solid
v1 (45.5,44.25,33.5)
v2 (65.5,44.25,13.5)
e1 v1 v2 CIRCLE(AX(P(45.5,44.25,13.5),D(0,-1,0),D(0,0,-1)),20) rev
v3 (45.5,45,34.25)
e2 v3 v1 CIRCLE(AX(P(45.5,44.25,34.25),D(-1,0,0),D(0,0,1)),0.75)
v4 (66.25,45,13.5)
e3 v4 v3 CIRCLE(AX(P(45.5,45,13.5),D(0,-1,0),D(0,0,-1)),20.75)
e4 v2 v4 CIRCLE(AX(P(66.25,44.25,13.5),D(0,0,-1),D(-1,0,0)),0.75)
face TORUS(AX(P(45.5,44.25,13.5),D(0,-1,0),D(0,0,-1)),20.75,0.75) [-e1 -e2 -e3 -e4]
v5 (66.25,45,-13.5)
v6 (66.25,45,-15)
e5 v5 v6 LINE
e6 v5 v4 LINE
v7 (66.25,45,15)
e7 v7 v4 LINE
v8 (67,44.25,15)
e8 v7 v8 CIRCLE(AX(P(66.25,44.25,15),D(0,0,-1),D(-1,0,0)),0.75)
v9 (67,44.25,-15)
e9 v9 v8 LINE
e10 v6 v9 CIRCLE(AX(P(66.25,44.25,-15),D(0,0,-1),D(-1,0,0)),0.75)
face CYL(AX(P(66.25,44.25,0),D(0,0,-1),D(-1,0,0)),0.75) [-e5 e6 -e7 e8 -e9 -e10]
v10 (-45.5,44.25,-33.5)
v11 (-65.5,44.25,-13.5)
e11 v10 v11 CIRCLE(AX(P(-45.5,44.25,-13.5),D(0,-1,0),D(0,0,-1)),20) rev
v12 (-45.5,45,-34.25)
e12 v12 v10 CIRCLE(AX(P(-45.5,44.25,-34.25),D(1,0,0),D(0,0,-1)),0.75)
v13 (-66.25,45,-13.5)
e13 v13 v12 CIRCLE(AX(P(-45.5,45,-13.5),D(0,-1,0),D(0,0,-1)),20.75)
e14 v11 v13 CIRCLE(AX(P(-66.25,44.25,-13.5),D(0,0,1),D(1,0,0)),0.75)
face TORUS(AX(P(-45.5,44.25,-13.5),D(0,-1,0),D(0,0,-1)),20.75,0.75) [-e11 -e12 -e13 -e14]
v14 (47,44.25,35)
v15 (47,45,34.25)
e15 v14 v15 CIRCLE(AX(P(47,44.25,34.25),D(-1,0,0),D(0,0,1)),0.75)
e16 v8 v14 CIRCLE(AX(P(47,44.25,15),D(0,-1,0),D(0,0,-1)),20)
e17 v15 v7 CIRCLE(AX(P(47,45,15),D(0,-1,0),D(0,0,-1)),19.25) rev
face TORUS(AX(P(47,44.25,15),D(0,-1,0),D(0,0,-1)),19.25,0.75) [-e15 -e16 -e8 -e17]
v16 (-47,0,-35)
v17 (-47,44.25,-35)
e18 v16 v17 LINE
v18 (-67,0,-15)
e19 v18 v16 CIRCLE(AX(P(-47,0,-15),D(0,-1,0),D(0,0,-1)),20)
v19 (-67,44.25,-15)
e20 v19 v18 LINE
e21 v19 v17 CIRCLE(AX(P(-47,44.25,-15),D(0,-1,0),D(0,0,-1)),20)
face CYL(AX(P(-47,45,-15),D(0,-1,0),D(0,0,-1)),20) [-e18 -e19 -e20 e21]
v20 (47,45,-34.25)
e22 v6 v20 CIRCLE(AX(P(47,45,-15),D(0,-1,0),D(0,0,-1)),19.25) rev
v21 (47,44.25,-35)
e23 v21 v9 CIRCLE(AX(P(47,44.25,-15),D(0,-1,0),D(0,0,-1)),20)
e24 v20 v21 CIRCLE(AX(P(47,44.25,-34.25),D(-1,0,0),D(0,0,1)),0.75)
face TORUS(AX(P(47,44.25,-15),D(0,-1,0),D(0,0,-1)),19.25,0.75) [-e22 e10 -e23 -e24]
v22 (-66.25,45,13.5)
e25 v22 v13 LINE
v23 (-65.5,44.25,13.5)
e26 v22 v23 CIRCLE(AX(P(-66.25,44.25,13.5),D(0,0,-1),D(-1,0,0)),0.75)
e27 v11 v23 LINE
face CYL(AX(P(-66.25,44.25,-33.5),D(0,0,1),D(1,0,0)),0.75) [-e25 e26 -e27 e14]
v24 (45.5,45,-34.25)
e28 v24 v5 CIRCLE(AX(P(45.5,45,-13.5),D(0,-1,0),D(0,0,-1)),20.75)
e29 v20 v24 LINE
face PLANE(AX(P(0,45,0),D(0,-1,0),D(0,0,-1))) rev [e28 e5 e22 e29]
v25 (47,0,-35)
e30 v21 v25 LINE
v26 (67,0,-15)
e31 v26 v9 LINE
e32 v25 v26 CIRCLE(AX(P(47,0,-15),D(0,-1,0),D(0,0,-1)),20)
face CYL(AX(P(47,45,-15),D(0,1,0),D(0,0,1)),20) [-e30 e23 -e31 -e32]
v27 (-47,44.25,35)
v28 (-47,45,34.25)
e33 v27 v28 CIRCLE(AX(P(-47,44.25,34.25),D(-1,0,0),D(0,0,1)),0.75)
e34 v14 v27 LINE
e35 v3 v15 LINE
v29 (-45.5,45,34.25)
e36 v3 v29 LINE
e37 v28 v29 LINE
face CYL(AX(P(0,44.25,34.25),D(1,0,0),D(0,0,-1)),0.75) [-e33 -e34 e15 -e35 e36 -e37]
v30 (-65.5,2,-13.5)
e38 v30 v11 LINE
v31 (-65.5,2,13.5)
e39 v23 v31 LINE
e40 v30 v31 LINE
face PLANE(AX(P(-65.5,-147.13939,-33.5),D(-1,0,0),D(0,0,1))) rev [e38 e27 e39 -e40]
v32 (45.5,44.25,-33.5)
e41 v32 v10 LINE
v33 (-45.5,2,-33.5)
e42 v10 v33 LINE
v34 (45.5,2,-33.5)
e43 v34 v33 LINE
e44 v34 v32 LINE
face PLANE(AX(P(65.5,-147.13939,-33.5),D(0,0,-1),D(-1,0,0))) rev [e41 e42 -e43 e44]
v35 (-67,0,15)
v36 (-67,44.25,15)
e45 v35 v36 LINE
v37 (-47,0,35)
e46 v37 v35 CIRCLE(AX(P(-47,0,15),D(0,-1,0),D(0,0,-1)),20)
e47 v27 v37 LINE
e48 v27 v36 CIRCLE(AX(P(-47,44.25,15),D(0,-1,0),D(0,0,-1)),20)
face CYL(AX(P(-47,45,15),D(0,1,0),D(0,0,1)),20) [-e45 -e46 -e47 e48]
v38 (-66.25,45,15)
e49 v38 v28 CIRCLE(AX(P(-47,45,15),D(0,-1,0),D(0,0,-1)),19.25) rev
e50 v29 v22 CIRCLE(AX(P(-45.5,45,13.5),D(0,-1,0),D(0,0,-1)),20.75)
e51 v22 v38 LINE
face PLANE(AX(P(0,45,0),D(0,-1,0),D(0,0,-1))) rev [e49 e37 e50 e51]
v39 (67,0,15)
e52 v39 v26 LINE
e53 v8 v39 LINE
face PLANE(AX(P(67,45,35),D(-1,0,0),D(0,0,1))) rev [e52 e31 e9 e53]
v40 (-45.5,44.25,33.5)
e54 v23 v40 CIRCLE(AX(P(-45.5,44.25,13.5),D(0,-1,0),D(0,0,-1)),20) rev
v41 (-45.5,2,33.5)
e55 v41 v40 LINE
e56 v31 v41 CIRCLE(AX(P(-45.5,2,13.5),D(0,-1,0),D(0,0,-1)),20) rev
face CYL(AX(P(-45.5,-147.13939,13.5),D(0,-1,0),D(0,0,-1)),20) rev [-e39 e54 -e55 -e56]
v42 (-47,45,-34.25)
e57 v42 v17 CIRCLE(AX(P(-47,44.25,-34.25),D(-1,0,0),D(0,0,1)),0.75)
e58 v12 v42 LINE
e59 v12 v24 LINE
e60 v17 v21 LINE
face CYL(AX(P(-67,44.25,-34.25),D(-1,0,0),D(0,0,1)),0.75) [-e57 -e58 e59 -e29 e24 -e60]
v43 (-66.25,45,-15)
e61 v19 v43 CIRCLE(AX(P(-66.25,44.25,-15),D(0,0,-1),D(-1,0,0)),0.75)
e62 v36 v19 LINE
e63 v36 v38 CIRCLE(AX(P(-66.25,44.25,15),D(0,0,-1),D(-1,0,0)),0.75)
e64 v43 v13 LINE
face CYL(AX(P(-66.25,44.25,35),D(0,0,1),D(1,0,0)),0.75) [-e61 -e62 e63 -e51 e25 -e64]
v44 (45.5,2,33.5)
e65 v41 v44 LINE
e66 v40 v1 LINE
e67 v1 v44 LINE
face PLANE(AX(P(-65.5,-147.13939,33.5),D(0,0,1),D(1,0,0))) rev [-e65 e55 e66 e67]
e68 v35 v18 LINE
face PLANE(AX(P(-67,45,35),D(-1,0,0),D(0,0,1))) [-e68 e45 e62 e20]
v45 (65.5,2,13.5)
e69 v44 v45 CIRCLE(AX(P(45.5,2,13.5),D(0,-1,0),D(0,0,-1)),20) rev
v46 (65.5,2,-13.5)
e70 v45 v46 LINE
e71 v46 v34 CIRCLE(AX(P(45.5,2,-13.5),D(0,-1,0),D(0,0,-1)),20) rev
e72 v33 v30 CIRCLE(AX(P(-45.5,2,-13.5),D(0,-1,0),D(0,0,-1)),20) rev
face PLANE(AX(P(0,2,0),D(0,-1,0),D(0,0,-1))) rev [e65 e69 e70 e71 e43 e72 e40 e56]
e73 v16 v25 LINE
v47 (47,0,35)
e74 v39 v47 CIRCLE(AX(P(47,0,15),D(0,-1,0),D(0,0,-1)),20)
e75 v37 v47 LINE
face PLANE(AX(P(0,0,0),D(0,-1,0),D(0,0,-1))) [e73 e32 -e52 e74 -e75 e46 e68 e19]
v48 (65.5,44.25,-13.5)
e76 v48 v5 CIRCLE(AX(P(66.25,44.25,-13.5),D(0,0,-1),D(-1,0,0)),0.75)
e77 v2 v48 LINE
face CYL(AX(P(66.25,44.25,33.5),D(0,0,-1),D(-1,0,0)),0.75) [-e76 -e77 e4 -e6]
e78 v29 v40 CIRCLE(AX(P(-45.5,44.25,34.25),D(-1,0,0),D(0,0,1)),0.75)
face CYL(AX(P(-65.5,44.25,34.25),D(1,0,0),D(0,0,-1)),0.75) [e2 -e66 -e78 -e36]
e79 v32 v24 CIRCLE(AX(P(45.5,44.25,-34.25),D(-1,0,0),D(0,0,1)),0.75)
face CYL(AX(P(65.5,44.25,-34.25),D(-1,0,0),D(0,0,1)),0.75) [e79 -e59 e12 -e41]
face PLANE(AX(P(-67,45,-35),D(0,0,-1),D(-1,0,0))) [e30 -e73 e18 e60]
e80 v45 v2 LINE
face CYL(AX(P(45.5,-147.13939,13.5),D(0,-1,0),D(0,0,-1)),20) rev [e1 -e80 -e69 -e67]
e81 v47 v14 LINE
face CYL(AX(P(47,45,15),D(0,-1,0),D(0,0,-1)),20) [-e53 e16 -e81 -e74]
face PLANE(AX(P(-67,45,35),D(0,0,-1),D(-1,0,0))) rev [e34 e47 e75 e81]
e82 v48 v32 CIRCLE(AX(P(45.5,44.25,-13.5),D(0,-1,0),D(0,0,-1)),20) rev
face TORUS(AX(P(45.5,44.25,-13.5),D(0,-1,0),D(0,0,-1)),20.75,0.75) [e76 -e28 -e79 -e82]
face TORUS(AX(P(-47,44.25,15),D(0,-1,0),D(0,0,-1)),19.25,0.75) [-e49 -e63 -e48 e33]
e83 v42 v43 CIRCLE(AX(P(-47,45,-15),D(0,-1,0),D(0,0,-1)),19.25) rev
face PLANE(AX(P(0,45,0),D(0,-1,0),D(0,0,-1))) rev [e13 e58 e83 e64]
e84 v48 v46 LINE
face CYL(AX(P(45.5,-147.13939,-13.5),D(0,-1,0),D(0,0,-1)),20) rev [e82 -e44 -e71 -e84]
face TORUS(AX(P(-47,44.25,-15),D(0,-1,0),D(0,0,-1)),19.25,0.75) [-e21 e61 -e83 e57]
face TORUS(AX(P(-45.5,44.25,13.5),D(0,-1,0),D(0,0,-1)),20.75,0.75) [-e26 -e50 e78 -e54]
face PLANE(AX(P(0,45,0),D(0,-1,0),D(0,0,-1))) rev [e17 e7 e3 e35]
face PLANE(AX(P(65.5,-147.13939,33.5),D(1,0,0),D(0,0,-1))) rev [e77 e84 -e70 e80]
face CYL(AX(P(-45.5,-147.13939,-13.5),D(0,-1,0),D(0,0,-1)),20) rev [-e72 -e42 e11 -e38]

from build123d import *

# Parameters (mm, degrees)
SKETCH_1_W          = 134
SKETCH_1_H          = 70
EXTRUDE_1_DEPTH     = 45
SKETCH_2_W          = 131
SKETCH_2_H          = 67
CUT_EXTRUDE_1_DEPTH = 43
FILLET_1_R          = 20
FILLET_2_R          = 0.75


with BuildPart() as part:
    # 草图1 → 凸台-拉伸1 (new body)
    with BuildSketch(Plane(origin=(0, 0, 0), x_dir=(1, 0, 0), z_dir=(0, 1, 0))):
        Rectangle(SKETCH_1_W, SKETCH_1_H)
    extrude(amount=EXTRUDE_1_DEPTH)

    # 草图2 → 切除-拉伸1 (cut)
    with BuildSketch(Plane(origin=(0, 45, 0), x_dir=(1, 0, 0), z_dir=(0, 1, 0))):
        Rectangle(SKETCH_2_W, SKETCH_2_H)
    extrude(amount=-CUT_EXTRUDE_1_DEPTH, mode=Mode.SUBTRACT)

    # 圆角1
    fillet_1_edges = [part.edges().sort_by_distance(p)[0] for p in [
        (-65.5, 23.5, 33.5),
        (65.5, 23.5, 33.5),
        (65.5, 23.5, -33.5),
        (-65.5, 23.5, -33.5),
        (-67, 22.5, 35),
        (67, 22.5, 35),
        (67, 22.5, -35),
        (-67, 22.5, -35),
    ]]
    fillet(fillet_1_edges, radius=FILLET_1_R)

    # 圆角2
    fillet_2_edges = [part.edges().sort_by_distance(p)[0] for p in [
        (0, 45, 33.5),
        (-65.5, 45, 0),
        (0, 45, 35),
        (-67, 45, 0),
        (0, 45, -35),
        (0, 45, -33.5),
        (65.5, 45, 0),
        (67, 45, 0),
        (-59.642135624, 45, 27.642135624),
        (-59.642135624, 45, -27.642135624),
        (59.642135624, 45, -27.642135624),
        (59.642135624, 45, 27.642135624),
        (61.142135624, 45, -29.142135624),
        (61.142135624, 45, 29.142135624),
        (-61.142135624, 45, -29.142135624),
        (-61.142135624, 45, 29.142135624),
    ]]
    fillet(fillet_2_edges, radius=FILLET_2_R - 0.0001)  # a hair under: the kernel refuses the full size


solid = part.part
